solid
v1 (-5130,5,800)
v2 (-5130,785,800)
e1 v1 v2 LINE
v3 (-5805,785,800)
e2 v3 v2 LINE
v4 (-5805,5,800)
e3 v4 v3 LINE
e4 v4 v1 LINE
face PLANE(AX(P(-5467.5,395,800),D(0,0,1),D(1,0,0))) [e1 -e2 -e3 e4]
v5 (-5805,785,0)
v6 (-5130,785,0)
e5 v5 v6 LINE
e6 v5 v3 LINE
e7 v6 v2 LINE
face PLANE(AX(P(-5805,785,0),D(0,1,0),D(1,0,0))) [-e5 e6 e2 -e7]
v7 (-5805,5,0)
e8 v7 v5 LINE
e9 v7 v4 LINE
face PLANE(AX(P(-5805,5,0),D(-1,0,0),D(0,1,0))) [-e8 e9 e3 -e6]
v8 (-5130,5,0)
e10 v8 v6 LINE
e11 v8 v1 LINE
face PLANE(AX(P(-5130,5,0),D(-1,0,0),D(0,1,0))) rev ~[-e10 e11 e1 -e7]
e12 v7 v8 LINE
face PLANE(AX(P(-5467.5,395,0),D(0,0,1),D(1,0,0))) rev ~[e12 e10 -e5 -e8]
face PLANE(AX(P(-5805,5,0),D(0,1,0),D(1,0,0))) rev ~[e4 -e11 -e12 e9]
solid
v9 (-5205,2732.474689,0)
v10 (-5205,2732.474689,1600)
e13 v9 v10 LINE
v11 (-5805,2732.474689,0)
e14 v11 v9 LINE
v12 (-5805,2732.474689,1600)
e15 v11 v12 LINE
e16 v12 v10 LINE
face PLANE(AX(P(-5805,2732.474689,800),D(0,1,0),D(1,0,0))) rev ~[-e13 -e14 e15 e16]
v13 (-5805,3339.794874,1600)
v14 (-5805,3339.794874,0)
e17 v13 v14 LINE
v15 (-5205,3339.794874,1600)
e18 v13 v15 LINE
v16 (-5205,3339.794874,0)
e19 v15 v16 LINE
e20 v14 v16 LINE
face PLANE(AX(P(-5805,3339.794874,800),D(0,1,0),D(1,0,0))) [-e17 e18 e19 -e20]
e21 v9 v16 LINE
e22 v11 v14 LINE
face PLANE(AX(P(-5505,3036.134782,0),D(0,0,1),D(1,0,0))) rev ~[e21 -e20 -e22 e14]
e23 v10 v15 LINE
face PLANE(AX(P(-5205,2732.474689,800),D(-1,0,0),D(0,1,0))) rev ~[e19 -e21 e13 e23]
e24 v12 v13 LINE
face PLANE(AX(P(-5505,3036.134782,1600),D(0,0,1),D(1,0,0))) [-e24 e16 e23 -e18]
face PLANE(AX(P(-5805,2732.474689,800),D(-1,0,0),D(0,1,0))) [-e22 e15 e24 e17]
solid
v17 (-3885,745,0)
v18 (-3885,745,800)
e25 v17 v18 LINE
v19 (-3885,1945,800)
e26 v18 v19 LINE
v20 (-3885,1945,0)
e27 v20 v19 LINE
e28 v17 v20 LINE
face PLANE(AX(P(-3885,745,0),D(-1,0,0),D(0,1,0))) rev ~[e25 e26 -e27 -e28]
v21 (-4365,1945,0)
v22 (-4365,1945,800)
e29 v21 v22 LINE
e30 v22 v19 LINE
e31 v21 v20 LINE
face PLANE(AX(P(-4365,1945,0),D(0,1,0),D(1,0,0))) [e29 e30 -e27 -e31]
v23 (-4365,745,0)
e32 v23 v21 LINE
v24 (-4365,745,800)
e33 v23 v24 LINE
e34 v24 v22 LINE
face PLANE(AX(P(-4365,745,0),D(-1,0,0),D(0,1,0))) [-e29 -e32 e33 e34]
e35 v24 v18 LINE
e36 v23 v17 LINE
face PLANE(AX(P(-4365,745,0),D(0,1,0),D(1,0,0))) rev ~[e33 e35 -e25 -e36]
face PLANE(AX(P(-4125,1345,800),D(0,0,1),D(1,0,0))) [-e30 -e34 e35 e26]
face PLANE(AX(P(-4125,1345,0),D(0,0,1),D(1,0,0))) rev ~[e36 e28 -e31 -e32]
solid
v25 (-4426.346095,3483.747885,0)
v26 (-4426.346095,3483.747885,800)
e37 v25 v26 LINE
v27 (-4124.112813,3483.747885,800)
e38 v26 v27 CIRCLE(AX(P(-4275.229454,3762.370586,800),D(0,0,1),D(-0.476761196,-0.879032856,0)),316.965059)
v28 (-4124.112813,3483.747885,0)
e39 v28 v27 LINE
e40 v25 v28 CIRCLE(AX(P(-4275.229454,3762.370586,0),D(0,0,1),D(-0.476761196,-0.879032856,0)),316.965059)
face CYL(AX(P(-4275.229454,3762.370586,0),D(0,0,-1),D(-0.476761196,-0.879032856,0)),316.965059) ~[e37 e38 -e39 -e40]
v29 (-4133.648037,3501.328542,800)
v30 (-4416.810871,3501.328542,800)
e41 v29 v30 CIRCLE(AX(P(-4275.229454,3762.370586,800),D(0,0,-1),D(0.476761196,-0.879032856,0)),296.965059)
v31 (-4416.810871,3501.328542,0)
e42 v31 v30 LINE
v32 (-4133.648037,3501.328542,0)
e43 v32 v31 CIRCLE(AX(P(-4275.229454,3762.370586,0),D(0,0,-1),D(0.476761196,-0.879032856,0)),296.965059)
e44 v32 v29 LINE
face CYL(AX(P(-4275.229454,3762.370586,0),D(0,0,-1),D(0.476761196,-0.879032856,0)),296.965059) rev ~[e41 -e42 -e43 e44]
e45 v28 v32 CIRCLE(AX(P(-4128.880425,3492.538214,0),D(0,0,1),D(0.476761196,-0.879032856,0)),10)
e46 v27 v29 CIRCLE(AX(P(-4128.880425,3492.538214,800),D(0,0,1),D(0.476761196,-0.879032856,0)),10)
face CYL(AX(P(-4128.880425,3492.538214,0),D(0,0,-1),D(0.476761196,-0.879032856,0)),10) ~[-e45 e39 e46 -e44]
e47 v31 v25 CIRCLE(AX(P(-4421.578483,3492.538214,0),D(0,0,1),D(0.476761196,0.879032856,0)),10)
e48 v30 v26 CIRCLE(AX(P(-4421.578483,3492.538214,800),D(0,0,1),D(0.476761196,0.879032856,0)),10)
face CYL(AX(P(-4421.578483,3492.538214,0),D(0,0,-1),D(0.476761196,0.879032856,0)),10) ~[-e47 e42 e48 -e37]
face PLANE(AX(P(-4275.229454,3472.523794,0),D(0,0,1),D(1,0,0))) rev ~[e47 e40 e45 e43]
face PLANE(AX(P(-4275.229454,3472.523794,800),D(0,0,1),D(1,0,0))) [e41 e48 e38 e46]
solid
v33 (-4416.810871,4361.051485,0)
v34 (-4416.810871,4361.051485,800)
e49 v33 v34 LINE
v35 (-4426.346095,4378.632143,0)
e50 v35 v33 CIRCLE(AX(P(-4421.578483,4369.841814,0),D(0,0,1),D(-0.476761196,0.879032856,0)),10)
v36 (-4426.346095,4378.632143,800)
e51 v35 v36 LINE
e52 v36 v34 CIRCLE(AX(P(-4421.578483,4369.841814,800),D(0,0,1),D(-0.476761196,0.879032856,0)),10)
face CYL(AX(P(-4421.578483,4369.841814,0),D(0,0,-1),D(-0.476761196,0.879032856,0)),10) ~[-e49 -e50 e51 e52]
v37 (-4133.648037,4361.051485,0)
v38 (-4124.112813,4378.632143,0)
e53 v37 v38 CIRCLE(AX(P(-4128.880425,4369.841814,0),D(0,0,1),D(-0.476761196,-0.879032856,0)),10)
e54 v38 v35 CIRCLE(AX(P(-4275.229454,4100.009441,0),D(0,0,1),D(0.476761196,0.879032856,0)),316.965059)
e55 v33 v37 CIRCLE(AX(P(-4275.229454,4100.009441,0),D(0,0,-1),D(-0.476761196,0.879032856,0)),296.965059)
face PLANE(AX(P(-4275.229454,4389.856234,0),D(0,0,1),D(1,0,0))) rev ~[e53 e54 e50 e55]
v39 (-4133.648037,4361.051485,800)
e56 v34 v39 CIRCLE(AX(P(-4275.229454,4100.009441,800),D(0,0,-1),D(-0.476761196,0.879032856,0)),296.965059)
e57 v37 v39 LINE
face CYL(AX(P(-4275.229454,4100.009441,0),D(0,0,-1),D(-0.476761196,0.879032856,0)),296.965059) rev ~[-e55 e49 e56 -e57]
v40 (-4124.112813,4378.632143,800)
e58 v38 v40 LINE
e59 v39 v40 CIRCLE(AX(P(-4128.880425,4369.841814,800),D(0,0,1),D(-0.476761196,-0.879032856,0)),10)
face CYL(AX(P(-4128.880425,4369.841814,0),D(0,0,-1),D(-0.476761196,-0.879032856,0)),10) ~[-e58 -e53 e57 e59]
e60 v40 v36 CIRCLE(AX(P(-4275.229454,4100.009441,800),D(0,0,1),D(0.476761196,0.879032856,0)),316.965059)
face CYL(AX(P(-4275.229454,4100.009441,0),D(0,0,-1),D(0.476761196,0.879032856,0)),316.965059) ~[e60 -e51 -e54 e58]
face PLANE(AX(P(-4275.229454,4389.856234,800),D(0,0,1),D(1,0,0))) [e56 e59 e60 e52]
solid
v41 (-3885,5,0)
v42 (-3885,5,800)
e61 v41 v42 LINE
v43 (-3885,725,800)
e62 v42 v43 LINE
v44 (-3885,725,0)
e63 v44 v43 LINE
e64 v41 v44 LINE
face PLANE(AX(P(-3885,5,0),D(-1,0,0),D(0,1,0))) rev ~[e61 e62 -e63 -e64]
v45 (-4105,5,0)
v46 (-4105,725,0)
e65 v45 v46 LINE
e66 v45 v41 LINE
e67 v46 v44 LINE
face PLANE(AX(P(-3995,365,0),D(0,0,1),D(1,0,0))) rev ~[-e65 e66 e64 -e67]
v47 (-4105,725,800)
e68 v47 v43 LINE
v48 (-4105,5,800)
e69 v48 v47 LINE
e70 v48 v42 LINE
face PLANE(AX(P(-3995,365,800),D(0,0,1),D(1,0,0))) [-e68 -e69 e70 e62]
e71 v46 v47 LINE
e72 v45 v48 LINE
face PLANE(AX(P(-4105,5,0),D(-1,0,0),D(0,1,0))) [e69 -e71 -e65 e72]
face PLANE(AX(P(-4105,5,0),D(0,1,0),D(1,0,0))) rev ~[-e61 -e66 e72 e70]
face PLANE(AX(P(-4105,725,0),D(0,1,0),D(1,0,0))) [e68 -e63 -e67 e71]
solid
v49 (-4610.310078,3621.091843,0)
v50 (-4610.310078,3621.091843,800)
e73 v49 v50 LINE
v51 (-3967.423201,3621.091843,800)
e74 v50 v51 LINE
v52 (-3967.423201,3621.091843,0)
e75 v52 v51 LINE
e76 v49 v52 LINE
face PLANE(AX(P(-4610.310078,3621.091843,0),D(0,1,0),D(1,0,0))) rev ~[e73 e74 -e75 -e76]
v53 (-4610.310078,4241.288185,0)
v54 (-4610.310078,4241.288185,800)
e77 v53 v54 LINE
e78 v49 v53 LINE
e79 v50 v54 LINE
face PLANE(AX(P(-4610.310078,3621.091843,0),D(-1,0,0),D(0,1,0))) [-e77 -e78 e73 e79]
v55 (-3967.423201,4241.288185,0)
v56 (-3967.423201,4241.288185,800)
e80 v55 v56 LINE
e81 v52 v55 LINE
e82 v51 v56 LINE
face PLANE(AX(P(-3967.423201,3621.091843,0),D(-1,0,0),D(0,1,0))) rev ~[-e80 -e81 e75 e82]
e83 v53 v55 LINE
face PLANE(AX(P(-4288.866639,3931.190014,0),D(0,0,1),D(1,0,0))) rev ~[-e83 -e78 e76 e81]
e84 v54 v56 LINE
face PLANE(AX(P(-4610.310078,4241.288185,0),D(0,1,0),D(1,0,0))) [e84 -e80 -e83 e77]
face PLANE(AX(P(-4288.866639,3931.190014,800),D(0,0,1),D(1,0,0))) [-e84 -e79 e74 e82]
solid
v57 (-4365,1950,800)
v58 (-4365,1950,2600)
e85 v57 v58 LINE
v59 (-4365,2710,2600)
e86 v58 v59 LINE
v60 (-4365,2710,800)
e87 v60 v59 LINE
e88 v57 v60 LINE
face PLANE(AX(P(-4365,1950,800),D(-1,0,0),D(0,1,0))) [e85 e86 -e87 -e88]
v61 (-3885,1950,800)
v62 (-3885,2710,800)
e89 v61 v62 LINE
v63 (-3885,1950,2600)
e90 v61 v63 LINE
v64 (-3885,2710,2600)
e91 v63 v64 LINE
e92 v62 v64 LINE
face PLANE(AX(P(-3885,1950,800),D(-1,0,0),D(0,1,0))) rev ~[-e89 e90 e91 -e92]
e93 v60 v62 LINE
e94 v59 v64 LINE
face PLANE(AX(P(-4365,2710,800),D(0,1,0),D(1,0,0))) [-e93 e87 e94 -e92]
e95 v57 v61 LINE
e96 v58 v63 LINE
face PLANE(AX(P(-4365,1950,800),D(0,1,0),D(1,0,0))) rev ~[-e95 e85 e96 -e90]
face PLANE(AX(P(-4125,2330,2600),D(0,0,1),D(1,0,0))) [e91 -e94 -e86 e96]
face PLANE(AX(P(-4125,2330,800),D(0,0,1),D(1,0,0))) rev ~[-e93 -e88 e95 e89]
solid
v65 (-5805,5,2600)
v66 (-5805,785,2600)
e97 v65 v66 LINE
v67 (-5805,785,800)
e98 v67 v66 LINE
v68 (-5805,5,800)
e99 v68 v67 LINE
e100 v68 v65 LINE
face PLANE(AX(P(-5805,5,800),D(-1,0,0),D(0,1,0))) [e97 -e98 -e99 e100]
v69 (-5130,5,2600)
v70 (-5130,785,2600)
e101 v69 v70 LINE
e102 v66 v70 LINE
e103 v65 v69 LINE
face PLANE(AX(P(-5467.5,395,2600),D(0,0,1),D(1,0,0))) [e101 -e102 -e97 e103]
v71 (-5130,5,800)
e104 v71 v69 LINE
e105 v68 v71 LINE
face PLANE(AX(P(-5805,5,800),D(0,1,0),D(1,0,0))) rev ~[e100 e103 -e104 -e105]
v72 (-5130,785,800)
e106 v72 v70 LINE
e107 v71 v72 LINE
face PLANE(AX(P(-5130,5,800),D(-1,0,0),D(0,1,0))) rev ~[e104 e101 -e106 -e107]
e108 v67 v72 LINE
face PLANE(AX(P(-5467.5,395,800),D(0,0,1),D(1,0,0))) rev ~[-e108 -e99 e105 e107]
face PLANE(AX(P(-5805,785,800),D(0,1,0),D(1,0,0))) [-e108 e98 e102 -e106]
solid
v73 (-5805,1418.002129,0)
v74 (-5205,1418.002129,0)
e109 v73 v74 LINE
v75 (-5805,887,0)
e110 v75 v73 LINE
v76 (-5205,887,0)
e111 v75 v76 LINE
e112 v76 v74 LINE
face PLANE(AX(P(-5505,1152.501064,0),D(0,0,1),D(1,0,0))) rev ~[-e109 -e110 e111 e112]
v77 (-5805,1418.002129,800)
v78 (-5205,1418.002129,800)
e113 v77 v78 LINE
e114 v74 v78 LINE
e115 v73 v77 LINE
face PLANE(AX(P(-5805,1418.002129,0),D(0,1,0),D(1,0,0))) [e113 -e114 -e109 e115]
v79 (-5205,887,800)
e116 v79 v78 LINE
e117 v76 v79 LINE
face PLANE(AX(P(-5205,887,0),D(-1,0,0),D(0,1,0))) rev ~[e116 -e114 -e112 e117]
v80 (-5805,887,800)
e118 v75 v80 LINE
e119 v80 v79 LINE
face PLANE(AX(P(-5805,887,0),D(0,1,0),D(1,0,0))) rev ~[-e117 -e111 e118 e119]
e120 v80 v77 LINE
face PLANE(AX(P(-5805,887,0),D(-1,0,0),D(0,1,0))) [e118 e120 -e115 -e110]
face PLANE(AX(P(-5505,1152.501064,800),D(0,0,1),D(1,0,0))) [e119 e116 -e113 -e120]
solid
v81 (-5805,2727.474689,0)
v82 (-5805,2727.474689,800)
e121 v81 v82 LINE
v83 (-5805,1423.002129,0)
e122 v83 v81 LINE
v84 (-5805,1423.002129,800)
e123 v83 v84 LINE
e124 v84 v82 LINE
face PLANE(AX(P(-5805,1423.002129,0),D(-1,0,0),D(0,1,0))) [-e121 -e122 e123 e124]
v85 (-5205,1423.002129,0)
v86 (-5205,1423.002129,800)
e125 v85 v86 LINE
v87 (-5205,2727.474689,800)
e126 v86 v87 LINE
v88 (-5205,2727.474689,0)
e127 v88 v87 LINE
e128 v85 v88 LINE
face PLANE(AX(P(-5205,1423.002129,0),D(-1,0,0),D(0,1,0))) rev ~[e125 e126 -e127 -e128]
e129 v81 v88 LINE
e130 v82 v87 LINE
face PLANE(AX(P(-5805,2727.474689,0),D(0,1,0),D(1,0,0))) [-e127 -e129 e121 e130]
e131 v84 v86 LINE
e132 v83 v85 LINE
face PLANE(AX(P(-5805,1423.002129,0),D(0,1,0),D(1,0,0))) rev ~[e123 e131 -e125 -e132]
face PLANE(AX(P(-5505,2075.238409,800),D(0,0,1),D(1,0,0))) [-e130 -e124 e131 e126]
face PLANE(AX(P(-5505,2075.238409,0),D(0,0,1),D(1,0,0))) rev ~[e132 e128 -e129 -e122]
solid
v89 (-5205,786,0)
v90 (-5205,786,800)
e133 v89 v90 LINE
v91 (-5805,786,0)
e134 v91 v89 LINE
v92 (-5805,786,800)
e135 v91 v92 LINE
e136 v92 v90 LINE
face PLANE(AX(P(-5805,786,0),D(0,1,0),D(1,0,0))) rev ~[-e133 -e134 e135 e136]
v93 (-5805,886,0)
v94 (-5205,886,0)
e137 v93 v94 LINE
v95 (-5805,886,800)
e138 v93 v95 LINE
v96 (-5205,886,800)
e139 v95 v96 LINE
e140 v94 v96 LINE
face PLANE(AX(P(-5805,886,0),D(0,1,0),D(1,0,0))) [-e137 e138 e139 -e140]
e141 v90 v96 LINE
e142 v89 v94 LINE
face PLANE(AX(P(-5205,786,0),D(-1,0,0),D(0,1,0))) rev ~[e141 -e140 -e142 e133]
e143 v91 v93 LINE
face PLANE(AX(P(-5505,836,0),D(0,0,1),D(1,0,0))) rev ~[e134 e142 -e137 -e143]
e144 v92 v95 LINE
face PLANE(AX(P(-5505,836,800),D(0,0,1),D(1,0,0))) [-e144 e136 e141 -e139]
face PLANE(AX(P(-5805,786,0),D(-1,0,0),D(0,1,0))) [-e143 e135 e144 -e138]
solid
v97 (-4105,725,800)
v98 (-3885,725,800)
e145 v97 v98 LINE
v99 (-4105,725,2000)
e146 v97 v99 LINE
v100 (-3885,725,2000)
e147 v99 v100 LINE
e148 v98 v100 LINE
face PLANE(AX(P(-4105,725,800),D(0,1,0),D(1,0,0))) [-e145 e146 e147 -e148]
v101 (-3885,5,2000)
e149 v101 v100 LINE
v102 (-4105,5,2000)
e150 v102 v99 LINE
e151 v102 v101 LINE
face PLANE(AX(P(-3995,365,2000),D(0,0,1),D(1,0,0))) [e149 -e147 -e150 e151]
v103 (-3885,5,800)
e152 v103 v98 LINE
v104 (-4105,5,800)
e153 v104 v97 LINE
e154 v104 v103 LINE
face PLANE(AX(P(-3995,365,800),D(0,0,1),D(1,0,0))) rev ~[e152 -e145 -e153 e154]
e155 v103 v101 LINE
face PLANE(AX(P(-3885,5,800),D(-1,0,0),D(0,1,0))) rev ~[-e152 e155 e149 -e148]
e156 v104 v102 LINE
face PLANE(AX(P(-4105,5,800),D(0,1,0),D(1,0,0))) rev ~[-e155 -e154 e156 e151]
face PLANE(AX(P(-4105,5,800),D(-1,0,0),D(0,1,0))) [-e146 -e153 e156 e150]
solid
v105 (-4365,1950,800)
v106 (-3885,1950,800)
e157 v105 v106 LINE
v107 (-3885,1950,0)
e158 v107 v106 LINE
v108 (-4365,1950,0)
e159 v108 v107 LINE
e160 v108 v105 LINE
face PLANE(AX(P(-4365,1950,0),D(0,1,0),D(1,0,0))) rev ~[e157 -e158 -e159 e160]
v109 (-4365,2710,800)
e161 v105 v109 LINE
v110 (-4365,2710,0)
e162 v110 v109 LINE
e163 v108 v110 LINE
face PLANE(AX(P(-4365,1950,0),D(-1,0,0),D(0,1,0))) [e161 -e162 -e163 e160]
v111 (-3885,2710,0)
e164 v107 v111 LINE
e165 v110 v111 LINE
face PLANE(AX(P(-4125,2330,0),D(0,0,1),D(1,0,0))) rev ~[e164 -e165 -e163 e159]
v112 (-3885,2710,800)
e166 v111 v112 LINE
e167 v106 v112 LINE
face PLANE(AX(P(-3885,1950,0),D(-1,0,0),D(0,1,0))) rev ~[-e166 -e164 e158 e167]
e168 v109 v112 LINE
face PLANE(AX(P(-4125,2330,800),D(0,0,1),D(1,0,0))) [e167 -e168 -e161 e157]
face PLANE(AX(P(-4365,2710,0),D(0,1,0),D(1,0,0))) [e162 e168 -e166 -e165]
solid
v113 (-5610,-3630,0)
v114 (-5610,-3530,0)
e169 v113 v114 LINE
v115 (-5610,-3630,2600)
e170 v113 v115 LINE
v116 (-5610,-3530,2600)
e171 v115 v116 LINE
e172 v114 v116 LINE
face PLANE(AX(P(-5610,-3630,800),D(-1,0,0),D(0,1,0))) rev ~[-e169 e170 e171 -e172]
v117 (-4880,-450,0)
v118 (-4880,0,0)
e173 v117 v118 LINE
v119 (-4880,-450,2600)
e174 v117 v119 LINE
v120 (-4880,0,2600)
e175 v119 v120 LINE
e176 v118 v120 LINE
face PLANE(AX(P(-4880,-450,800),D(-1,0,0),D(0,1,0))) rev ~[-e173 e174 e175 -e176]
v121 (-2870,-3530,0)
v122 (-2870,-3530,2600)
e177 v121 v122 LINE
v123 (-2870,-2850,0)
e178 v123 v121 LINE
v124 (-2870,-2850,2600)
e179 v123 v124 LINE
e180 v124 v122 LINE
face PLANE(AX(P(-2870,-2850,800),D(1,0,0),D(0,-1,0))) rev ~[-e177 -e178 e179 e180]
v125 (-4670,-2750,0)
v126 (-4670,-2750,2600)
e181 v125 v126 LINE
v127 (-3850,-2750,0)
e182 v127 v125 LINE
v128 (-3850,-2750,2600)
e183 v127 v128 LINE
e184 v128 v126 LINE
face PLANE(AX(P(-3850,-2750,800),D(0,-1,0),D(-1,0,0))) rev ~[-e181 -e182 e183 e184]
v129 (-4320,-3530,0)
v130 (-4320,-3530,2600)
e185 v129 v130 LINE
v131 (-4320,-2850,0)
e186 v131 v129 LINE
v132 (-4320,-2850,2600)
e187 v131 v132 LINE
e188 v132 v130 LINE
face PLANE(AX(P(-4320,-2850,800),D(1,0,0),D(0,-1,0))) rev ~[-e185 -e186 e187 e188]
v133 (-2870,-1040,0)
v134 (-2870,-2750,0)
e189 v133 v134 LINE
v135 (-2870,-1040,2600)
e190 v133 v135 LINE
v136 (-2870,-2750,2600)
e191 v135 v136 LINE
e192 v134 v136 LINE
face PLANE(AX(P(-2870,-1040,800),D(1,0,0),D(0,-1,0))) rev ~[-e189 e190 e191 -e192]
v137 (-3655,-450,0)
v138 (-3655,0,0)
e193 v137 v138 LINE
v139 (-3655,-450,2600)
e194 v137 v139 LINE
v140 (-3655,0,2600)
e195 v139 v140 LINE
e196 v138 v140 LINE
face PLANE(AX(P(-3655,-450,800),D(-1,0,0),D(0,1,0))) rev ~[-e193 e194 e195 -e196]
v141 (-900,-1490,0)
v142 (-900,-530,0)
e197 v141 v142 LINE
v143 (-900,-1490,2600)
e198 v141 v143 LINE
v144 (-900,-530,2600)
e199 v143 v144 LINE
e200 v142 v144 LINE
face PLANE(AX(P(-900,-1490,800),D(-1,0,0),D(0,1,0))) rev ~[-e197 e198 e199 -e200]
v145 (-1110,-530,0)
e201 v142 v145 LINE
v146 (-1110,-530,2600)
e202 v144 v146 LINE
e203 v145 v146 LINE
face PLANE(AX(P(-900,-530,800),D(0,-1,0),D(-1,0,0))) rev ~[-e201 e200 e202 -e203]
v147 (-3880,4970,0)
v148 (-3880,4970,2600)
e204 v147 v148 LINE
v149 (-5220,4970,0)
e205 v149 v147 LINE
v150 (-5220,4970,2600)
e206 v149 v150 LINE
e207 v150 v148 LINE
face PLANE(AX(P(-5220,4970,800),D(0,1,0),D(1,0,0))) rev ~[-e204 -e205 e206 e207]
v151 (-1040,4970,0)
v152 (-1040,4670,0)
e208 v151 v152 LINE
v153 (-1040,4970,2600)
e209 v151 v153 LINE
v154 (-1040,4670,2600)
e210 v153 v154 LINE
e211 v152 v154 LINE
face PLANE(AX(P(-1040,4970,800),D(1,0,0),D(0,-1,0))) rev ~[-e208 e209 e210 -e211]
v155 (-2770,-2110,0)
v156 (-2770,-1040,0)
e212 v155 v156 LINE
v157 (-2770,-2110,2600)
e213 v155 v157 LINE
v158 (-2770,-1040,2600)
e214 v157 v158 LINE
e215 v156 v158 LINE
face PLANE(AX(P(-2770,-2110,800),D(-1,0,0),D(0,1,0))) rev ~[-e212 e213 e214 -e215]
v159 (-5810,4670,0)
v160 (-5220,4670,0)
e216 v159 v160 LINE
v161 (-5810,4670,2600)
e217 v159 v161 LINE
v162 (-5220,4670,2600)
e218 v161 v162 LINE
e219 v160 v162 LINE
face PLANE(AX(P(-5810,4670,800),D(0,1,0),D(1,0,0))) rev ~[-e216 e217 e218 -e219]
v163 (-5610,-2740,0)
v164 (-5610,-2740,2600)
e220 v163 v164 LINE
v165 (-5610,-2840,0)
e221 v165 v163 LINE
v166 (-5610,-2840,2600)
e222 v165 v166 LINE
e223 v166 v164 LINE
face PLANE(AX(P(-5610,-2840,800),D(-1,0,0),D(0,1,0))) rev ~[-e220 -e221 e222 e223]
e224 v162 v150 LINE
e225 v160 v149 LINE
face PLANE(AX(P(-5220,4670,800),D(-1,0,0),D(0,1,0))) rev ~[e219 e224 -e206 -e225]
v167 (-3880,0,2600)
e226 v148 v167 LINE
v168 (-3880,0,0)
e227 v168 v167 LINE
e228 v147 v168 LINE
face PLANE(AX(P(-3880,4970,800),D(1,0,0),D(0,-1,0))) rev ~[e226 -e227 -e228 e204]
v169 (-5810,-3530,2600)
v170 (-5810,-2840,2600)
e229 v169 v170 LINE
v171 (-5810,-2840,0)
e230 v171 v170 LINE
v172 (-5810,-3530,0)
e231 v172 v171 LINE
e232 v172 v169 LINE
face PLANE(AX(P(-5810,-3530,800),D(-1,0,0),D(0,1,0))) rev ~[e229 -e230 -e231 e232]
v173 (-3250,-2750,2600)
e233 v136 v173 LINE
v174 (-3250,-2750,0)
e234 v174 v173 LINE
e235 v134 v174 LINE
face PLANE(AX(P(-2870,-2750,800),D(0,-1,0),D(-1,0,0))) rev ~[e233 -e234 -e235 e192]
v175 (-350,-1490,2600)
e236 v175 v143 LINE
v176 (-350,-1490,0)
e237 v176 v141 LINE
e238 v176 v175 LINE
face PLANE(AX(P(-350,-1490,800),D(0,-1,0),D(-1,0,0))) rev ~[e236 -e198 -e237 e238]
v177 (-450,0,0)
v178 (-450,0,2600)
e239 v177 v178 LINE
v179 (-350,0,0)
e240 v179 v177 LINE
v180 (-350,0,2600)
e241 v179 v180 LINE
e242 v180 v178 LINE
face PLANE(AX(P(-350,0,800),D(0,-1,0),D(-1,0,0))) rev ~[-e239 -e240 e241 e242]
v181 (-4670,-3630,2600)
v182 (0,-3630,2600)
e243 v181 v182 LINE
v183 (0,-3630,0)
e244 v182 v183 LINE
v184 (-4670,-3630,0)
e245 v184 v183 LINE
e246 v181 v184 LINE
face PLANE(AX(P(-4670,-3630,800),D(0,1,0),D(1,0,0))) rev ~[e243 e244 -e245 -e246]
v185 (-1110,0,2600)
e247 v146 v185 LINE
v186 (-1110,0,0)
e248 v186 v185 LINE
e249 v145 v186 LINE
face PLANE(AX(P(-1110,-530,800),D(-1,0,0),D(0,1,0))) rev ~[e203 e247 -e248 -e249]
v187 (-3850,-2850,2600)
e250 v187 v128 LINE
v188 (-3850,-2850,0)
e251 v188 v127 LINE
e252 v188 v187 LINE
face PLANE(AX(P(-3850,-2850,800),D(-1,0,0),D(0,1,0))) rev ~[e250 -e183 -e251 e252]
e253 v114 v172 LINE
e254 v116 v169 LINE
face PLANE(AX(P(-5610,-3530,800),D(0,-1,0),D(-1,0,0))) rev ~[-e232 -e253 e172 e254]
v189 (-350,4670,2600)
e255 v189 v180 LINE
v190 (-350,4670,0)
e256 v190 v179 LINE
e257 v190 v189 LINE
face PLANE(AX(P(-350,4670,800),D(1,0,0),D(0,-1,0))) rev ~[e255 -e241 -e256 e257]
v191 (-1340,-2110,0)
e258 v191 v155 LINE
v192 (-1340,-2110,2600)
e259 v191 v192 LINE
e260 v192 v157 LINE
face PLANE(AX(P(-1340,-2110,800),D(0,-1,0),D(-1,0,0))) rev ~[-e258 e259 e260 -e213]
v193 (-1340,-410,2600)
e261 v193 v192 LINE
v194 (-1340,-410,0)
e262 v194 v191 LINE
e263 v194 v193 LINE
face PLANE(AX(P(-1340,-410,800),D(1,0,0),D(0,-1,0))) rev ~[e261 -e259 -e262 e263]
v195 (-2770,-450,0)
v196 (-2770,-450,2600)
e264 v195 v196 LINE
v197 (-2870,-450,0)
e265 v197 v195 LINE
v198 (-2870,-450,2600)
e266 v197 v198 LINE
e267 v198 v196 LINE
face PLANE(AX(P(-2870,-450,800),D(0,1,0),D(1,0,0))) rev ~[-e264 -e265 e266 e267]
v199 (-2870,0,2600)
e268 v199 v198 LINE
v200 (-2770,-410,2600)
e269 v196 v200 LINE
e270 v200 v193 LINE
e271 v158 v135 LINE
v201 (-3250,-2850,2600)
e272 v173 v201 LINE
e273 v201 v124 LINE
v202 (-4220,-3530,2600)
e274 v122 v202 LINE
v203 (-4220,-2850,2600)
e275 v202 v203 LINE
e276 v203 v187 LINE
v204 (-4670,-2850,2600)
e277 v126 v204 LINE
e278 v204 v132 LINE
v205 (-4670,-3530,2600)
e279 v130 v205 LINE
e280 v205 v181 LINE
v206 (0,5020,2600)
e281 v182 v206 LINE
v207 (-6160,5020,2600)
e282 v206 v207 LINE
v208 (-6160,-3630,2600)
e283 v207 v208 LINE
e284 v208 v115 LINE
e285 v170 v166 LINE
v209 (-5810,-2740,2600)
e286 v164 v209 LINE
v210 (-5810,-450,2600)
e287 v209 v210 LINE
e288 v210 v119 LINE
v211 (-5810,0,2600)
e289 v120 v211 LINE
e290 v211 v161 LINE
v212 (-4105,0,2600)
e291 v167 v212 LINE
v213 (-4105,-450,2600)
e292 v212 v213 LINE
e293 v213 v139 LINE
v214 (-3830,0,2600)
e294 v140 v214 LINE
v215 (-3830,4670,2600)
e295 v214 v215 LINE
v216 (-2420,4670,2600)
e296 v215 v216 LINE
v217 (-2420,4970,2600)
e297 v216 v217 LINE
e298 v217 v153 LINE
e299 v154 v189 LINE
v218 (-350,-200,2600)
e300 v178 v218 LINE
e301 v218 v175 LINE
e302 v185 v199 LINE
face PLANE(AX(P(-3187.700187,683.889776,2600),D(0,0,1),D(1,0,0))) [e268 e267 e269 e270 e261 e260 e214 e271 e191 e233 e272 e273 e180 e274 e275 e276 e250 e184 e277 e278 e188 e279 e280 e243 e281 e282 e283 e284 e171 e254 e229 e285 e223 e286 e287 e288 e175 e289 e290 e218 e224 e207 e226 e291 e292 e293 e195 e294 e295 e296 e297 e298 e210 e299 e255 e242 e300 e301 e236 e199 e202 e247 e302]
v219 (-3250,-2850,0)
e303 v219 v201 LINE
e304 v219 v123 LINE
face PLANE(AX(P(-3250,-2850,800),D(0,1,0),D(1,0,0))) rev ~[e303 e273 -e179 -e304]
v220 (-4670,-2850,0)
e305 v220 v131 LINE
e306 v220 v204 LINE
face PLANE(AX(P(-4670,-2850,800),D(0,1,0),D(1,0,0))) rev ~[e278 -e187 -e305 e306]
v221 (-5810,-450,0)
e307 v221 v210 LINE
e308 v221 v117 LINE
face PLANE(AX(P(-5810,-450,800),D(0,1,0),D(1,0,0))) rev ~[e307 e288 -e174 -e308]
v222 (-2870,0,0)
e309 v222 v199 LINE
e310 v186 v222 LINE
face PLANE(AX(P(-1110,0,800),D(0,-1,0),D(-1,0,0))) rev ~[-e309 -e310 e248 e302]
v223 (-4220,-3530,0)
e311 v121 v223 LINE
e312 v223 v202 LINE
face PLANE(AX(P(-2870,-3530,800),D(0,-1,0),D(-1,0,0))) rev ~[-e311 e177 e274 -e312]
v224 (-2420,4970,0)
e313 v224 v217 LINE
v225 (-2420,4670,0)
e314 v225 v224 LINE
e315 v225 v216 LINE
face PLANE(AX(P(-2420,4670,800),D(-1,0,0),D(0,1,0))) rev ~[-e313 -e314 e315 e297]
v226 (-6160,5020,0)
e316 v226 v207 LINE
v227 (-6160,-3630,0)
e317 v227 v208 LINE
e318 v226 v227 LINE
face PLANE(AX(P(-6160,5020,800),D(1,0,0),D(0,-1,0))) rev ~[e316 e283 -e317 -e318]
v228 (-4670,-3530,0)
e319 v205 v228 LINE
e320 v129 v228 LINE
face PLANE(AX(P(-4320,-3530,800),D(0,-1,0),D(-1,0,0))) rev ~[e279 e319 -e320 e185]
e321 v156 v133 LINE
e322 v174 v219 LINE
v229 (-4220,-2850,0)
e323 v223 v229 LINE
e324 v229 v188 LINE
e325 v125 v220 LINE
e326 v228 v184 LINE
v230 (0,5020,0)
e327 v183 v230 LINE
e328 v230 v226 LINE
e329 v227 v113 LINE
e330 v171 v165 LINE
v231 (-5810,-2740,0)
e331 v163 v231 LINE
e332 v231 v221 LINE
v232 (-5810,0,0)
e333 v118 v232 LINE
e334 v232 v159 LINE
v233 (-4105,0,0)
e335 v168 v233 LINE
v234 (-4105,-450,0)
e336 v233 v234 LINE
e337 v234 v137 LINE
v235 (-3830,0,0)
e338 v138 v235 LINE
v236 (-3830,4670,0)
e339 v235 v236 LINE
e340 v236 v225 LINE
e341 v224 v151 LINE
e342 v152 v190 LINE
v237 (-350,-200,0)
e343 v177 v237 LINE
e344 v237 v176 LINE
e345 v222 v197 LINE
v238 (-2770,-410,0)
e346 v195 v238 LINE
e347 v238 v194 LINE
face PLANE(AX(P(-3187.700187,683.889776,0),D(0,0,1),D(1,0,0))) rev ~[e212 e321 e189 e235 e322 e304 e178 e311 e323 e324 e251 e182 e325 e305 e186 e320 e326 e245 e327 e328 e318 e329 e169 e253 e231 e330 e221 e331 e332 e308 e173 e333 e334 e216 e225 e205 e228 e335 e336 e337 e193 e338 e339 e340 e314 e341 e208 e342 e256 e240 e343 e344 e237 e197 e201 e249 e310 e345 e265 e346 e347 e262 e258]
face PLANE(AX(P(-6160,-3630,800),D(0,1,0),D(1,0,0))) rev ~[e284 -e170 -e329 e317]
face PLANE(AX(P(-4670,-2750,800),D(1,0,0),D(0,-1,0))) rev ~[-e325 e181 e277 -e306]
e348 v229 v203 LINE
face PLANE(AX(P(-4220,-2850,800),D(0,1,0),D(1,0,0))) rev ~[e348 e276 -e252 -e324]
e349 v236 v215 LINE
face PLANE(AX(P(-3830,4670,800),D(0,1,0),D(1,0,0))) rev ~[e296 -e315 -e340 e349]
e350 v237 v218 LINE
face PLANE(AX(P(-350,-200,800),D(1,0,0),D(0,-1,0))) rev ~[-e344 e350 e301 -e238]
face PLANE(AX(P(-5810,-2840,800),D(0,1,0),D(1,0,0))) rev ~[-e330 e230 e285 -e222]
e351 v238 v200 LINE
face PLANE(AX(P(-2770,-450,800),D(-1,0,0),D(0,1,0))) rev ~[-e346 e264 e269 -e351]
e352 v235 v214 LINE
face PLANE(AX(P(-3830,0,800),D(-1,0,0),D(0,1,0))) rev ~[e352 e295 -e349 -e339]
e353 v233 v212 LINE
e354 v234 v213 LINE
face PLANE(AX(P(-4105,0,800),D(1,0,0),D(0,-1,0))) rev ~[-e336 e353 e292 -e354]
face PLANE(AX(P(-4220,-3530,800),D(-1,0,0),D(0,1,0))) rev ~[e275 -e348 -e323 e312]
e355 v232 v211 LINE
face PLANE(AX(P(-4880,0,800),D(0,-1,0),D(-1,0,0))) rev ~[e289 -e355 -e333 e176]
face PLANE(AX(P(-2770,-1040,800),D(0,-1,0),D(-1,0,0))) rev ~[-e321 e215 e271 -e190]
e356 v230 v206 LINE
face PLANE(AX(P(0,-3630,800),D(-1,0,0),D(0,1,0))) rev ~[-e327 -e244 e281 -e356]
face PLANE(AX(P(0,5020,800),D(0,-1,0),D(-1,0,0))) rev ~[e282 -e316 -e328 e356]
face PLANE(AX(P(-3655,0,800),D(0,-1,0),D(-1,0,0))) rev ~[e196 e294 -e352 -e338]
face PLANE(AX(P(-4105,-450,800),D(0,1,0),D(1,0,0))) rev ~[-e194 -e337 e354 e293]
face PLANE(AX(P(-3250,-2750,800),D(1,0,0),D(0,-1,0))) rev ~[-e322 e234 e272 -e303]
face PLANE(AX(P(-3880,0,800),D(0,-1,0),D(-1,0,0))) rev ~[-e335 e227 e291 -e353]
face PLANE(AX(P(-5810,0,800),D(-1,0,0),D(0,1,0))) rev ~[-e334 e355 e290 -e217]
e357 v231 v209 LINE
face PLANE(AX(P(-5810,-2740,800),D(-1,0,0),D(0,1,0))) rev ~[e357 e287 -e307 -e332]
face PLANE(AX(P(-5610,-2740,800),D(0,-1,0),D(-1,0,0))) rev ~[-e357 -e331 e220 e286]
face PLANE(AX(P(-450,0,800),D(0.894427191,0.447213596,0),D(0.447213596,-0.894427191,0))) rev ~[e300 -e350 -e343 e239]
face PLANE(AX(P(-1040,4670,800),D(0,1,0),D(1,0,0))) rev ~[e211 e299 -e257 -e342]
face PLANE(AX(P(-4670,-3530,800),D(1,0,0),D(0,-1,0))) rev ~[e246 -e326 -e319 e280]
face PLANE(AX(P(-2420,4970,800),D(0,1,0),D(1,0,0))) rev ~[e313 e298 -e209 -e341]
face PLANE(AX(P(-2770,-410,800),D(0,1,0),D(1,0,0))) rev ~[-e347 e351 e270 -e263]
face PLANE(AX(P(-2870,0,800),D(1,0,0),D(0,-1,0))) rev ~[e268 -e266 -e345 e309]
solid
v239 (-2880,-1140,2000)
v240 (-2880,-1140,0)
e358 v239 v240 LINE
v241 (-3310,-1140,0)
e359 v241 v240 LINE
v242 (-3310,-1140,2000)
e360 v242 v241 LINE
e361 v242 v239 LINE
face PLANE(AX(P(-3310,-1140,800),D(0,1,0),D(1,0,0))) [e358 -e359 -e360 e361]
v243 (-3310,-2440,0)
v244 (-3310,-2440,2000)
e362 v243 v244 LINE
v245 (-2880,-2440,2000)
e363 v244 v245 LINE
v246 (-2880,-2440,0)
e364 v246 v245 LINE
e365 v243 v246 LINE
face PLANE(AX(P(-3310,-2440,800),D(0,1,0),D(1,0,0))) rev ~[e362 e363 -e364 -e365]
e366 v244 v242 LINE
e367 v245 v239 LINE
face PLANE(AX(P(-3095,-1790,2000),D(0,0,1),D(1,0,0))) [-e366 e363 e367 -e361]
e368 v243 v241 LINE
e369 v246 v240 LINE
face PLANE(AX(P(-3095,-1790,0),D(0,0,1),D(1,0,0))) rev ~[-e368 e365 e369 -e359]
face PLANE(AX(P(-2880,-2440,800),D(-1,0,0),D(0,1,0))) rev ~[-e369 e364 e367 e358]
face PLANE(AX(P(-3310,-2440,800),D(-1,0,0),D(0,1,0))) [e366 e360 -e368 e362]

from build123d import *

# Parameters (mm, degrees)
F1_DEPTH = 800
F0_W     = 430
F0_H     = 1300
F0_W_2   = 220
F0_H_2   = 720
F0_W_3   = 480
F0_H_3   = 1200
F0_H_4   = 760
F0_W_4   = 675
F0_H_5   = 780
F0_W_5   = 600
F0_H_6   = 531.0021286011
F0_H_7   = 100
F0_H_8   = 1304.4725608826
F0_H_9   = 607.3201847076
F0_W_6   = 642.8868770599
F0_H_10  = 620.1963424683
F2_DEPTH = 1200
F3_DEPTH = 800
F4_DEPTH = 1800


with BuildPart() as f1:
    # F0 (on Top) → F1 (new body)
    with BuildSketch(Plane.XY):
        Polygon((0, -3630), (0, 5020), (-6160, 5020), (-6160, -3630), (-5810, -3630), (-5610, -3630), (-5610, -3530), (-5810, -3530), (-5810, -2840), (-5610, -2840), (-5610, -2740), (-5810, -2740), (-5810, -450), (-4880, -450), (-4880, 0), (-5810, 0), (-5810, 4670), (-5220, 4670), (-5220, 4970), (-3880, 4970), (-3880, 4670), (-3880, 0), (-4105, 0), (-4105, -450), (-3655, -450), (-3655, 0), (-3830, 0), (-3830, 4670), (-2420, 4670), (-2420, 4970), (-1040, 4970), (-1040, 4670), (-350, 4670), (-350, 0), (-450, 0), (-350, -200), (-350, -1490), (-900, -1490), (-900, -530), (-1110, -530), (-1110, 0), (-2870, 0), (-2870, -450), (-2770, -450), (-2770, -410), (-1340, -410), (-1340, -2110), (-2770, -2110), (-2770, -1040), (-2870, -1040), (-2870, -2750), (-3250, -2750), (-3250, -2850), (-2870, -2850), (-2870, -3530), (-4220, -3530), (-4220, -2850), (-3850, -2850), (-3850, -2750), (-4670, -2750), (-4670, -2850), (-4320, -2850), (-4320, -3530), (-4670, -3530), (-4670, -3630), (-4320, -3630), align=None)
    extrude(amount=F1_DEPTH)

    # F4 (add): a face of the model
    f4_faces = [f1.faces().sort_by_distance(p)[0] for p in [
        (-2581.1160504996, -299.791944949, 800),
    ]]
    extrude(f4_faces, amount=F4_DEPTH)


with BuildPart() as f1b:
    # F0 (on Top) → F1, piece 2 (new body)
    with BuildSketch(Plane.XY):
        with Locations((-3095, -1790)):
            Rectangle(F0_W, F0_H)
    extrude(amount=F1_DEPTH)

    # F2 (add): a face of the model
    f2_faces = [f1b.faces().sort_by_distance(p)[0] for p in [
        (-3095, -1790, 800),
    ]]
    extrude(f2_faces, amount=F2_DEPTH)


with BuildPart() as f1c:
    # F0 (on Top) → F1, piece 3 (new body)
    with BuildSketch(Plane.XY):
        with Locations((-3995, 365)):
            Rectangle(F0_W_2, F0_H_2)
    extrude(amount=F1_DEPTH)


with BuildPart() as f1d:
    # F0 (on Top) → F1, piece 4 (new body)
    with BuildSketch(Plane.XY):
        with Locations((-4125, 1345)):
            Rectangle(F0_W_3, F0_H_3)
    extrude(amount=F1_DEPTH)


with BuildPart() as f1e:
    # F0 (on Top) → F1, piece 5 (new body)
    with BuildSketch(Plane.XY):
        with Locations((-4125, 2330)):
            Rectangle(F0_W_3, F0_H_4)
    extrude(amount=F1_DEPTH)


with BuildPart() as f1f:
    # F0 (on Top) → F1, piece 6 (new body)
    with BuildSketch(Plane.XY):
        with Locations((-5467.5, 395)):
            Rectangle(F0_W_4, F0_H_5)
    extrude(amount=F1_DEPTH)


with BuildPart() as f1g:
    # F0 (on Top) → F1, piece 7 (new body)
    with BuildSketch(Plane.XY):
        with Locations((-5505, 1152.5010643005)):
            Rectangle(F0_W_5, F0_H_6)
    extrude(amount=F1_DEPTH)


with BuildPart() as f1h:
    # F0 (on Top) → F1, piece 8 (new body)
    with BuildSketch(Plane.XY):
        with Locations((-5505, 836)):
            Rectangle(F0_W_5, F0_H_7)
    extrude(amount=F1_DEPTH)


with BuildPart() as f1i:
    # F0 (on Top) → F1, piece 9 (new body)
    with BuildSketch(Plane.XY):
        with Locations((-5505, 2075.2384090424)):
            Rectangle(F0_W_5, F0_H_8)
    extrude(amount=F1_DEPTH)


with BuildPart() as f1j:
    # F0 (on Top) → F1, piece 10 (new body)
    with BuildSketch(Plane.XY):
        with Locations((-5505, 3036.1347818375)):
            Rectangle(F0_W_5, F0_H_9)
    extrude(amount=F1_DEPTH)

    # F3 (add): a face of the model
    f3_faces = [f1j.faces().sort_by_distance(p)[0] for p in [
        (-5505, 3036.1347818375, 800),
    ]]
    extrude(f3_faces, amount=F3_DEPTH)


with BuildPart() as f1k:
    # F0 (on Top) → F1, piece 11 (new body)
    with BuildSketch(Plane.XY):
        with Locations((-4288.8666391373, 3931.1900138855)):
            Rectangle(F0_W_6, F0_H_10)
    extrude(amount=F1_DEPTH)


with BuildPart() as f1l:
    # F0 (on Top) → F1, piece 12 (new body)
    with BuildSketch(Plane.XY):
        with BuildLine():
            ThreePointArc((-4416.8108707663, 3501.328542291), (-4430.368811286, 3497.3058256885), (-4426.3460946835, 3483.7478851687))
            ThreePointArc((-4426.3460946835, 3483.7478851687), (-4275.2294540405, 3445.4055272516), (-4124.1128133976, 3483.7478851687))
            ThreePointArc((-4124.1128133976, 3483.7478851687), (-4120.0900967951, 3497.3058256885), (-4133.6480373148, 3501.328542291))
            ThreePointArc((-4133.6480373148, 3501.328542291), (-4275.2294540405, 3465.4055272516), (-4416.8108707663, 3501.328542291))
        make_face()
    extrude(amount=F1_DEPTH)


with BuildPart() as f1m:
    # F0 (on Top) → F1, piece 13 (new body)
    with BuildSketch(Plane.XY):
        with BuildLine():
            ThreePointArc((-4416.8108707663, 4361.05148548), (-4275.2294540405, 4396.9745005194), (-4133.6480373148, 4361.05148548))
            ThreePointArc((-4133.6480373148, 4361.05148548), (-4120.0900967951, 4365.0742020825), (-4124.1128133976, 4378.6321426022))
            ThreePointArc((-4124.1128133976, 4378.6321426022), (-4275.2294540405, 4416.9745005194), (-4426.3460946835, 4378.6321426022))
            ThreePointArc((-4426.3460946835, 4378.6321426022), (-4430.368811286, 4365.0742020825), (-4416.8108707663, 4361.05148548))
        make_face()
    extrude(amount=F1_DEPTH)


with BuildPart() as f2:
    # F2#2 (new): a face of the model
    f2_2_faces = [f1c.part.faces().sort_by_distance(p)[0] for p in [
        (-3995, 365, 800),
    ]]
    extrude(f2_2_faces, amount=F2_DEPTH)


with BuildPart() as f4:
    # F4#2 (new): a face of the model
    f4_2_faces = [f1f.part.faces().sort_by_distance(p)[0] for p in [
        (-5467.5, 395, 800),
    ]]
    extrude(f4_2_faces, amount=F4_DEPTH)


with BuildPart() as f4b:
    # F4#3 (new): a face of the model
    f4_3_faces = [f1e.part.faces().sort_by_distance(p)[0] for p in [
        (-4125, 2330, 800),
    ]]
    extrude(f4_3_faces, amount=F4_DEPTH)


solid = Compound([f1.part, f1b.part, f1c.part, f1d.part, f1e.part, f1f.part, f1g.part, f1h.part, f1i.part, f1j.part, f1k.part, f1l.part, f1m.part, f2.part, f4.part, f4b.part])
